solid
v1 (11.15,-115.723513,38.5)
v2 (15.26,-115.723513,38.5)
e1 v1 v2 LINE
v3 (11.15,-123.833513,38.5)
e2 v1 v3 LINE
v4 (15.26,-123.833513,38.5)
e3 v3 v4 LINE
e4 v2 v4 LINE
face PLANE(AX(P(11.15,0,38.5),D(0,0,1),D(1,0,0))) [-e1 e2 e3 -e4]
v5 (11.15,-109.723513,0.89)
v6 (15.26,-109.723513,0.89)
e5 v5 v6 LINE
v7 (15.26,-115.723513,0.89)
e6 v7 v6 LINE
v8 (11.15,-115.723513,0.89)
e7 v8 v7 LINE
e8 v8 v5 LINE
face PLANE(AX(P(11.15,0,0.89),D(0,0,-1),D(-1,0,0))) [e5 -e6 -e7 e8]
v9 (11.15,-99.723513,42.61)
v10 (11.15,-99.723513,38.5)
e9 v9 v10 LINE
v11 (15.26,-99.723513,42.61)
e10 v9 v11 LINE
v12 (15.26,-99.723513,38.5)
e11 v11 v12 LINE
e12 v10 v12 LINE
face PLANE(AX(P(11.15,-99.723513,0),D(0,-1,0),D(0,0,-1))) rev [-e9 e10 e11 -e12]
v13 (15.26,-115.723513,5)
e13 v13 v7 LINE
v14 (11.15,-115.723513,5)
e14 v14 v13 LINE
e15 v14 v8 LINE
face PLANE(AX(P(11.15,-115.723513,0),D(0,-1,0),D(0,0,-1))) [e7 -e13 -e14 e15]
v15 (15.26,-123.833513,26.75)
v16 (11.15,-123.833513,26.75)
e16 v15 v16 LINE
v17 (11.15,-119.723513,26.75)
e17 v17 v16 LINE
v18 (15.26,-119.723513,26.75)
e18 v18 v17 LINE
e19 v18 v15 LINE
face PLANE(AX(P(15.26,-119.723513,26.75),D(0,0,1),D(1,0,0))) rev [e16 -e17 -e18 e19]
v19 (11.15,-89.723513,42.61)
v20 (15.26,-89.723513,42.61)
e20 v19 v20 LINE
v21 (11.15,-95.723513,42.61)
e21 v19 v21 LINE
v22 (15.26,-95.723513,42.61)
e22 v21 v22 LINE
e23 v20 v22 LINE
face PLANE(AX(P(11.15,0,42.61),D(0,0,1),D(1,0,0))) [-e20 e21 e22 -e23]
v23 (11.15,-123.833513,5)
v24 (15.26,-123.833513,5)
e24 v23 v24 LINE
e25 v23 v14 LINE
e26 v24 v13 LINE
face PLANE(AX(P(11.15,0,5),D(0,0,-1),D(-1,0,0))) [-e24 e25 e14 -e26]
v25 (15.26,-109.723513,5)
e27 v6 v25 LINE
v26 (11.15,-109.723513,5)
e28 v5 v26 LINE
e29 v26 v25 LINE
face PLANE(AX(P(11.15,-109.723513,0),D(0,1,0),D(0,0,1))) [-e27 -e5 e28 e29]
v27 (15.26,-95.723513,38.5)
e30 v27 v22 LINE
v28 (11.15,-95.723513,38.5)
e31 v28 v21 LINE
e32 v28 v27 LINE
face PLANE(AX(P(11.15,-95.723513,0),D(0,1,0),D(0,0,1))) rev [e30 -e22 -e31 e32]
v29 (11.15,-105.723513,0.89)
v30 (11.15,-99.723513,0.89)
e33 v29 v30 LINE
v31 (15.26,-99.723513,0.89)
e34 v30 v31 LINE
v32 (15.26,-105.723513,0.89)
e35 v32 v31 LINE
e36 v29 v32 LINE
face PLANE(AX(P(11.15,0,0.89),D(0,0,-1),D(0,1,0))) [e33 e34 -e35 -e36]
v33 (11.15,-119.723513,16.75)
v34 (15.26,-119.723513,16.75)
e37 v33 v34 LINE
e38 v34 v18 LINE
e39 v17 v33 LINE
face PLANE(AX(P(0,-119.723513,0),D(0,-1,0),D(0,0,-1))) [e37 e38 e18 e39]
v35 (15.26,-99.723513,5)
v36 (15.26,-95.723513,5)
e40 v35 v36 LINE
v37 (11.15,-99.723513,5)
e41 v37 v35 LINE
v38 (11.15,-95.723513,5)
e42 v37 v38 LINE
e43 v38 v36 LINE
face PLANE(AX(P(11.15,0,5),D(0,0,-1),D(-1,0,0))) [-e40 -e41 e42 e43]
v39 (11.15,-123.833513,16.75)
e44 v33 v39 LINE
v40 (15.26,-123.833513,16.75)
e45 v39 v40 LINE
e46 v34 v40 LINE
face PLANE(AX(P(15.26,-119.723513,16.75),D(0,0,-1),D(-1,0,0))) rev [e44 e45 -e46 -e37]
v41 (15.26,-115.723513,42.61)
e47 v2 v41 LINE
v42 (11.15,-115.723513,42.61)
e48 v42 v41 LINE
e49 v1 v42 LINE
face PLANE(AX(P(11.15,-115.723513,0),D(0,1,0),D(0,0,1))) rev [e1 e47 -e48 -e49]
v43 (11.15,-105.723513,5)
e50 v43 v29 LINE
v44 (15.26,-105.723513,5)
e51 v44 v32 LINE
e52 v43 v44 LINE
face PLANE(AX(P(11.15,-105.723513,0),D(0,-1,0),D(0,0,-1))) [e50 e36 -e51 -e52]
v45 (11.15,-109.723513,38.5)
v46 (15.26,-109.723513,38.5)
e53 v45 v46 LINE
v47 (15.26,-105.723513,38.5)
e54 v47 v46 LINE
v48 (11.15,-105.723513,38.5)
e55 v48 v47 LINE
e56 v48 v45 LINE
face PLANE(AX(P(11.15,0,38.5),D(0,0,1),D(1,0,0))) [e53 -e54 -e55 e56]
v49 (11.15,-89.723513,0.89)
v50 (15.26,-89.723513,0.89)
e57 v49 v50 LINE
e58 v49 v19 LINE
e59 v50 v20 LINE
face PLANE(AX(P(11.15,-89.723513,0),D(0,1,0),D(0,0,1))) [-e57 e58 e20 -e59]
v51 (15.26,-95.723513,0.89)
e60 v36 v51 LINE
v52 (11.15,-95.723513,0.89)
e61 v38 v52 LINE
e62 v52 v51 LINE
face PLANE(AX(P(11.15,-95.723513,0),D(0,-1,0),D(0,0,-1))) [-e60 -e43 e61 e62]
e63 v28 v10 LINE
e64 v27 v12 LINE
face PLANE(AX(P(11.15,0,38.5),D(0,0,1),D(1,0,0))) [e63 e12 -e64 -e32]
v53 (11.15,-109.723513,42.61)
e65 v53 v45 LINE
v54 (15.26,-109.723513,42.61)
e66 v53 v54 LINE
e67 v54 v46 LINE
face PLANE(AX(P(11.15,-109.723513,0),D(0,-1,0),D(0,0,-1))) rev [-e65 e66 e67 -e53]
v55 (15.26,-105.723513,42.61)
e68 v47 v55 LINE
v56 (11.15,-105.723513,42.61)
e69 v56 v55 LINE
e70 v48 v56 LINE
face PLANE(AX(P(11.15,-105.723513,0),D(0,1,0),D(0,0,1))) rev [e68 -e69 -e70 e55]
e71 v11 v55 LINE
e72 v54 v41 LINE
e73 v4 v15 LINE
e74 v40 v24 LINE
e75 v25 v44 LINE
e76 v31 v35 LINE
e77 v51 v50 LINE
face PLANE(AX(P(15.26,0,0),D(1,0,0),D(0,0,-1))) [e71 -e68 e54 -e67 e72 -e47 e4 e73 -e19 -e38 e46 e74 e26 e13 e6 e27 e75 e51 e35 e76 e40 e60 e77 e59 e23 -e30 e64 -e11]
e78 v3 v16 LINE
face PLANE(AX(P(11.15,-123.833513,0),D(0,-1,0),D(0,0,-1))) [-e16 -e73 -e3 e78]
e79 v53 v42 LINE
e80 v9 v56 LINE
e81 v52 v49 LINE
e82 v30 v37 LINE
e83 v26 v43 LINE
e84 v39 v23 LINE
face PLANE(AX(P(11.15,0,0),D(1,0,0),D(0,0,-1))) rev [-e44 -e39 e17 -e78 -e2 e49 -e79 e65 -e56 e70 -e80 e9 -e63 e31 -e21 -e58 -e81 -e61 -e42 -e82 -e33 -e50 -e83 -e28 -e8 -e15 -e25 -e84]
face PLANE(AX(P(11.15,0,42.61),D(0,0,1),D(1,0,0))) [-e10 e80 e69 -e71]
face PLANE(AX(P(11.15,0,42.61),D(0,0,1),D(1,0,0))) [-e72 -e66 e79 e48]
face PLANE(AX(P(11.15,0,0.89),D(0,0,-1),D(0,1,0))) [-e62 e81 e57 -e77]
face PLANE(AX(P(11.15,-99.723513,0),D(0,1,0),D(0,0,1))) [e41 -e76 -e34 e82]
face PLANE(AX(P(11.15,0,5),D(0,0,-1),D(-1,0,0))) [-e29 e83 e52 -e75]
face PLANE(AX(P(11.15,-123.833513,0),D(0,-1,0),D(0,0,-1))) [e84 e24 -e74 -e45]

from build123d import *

# Parameters (mm, degrees)
BOSS_EXTRUDE1_DEPTH     = 4.11
PADDLE_MASTER_START     = 16.75
PADDLE_MASTER_OUTLINE_W = 4.11
PADDLE_MASTER_OUTLINE_H = 4.11
PADDLE_MASTER_DEPTH     = 10


# Read off the part's stored shape, not the designer's step: paddle_master
with BuildPart() as part:
    # motor_support_side-paddle_master<2> → Boss-Extrude1 (new body)
    with BuildSketch(Plane(origin=(15.26, -123.833512511, 38.5), x_dir=(0, 0, -1), z_dir=(1, 0, 0))):
        Polygon((33.5, 34.11), (0, 34.11), (-4.11, 34.11), (-4.11, 28.11), (0, 28.11), (0, 24.11), (-4.11, 24.11), (-4.11, 18.11), (0, 18.11), (0, 14.11), (-4.11, 14.11), (-4.11, 8.11), (0, 8.11), (0, 0), (33.5, 0), (33.5, 8.11), (37.61, 8.11), (37.61, 14.11), (33.5, 14.11), (33.5, 18.11), (37.61, 18.11), (37.61, 24.11), (33.5, 24.11), (33.5, 28.11), (37.61, 28.11), (37.61, 34.11), align=None)
    extrude(amount=-BOSS_EXTRUDE1_DEPTH)

    # paddle_master outline → paddle_master (cut)
    with BuildSketch(Plane.XY.offset(PADDLE_MASTER_START)):
        with Locations((13.205, -121.778512511)):
            Rectangle(PADDLE_MASTER_OUTLINE_W, PADDLE_MASTER_OUTLINE_H)
    extrude(amount=PADDLE_MASTER_DEPTH, mode=Mode.SUBTRACT)


solid = part.part
